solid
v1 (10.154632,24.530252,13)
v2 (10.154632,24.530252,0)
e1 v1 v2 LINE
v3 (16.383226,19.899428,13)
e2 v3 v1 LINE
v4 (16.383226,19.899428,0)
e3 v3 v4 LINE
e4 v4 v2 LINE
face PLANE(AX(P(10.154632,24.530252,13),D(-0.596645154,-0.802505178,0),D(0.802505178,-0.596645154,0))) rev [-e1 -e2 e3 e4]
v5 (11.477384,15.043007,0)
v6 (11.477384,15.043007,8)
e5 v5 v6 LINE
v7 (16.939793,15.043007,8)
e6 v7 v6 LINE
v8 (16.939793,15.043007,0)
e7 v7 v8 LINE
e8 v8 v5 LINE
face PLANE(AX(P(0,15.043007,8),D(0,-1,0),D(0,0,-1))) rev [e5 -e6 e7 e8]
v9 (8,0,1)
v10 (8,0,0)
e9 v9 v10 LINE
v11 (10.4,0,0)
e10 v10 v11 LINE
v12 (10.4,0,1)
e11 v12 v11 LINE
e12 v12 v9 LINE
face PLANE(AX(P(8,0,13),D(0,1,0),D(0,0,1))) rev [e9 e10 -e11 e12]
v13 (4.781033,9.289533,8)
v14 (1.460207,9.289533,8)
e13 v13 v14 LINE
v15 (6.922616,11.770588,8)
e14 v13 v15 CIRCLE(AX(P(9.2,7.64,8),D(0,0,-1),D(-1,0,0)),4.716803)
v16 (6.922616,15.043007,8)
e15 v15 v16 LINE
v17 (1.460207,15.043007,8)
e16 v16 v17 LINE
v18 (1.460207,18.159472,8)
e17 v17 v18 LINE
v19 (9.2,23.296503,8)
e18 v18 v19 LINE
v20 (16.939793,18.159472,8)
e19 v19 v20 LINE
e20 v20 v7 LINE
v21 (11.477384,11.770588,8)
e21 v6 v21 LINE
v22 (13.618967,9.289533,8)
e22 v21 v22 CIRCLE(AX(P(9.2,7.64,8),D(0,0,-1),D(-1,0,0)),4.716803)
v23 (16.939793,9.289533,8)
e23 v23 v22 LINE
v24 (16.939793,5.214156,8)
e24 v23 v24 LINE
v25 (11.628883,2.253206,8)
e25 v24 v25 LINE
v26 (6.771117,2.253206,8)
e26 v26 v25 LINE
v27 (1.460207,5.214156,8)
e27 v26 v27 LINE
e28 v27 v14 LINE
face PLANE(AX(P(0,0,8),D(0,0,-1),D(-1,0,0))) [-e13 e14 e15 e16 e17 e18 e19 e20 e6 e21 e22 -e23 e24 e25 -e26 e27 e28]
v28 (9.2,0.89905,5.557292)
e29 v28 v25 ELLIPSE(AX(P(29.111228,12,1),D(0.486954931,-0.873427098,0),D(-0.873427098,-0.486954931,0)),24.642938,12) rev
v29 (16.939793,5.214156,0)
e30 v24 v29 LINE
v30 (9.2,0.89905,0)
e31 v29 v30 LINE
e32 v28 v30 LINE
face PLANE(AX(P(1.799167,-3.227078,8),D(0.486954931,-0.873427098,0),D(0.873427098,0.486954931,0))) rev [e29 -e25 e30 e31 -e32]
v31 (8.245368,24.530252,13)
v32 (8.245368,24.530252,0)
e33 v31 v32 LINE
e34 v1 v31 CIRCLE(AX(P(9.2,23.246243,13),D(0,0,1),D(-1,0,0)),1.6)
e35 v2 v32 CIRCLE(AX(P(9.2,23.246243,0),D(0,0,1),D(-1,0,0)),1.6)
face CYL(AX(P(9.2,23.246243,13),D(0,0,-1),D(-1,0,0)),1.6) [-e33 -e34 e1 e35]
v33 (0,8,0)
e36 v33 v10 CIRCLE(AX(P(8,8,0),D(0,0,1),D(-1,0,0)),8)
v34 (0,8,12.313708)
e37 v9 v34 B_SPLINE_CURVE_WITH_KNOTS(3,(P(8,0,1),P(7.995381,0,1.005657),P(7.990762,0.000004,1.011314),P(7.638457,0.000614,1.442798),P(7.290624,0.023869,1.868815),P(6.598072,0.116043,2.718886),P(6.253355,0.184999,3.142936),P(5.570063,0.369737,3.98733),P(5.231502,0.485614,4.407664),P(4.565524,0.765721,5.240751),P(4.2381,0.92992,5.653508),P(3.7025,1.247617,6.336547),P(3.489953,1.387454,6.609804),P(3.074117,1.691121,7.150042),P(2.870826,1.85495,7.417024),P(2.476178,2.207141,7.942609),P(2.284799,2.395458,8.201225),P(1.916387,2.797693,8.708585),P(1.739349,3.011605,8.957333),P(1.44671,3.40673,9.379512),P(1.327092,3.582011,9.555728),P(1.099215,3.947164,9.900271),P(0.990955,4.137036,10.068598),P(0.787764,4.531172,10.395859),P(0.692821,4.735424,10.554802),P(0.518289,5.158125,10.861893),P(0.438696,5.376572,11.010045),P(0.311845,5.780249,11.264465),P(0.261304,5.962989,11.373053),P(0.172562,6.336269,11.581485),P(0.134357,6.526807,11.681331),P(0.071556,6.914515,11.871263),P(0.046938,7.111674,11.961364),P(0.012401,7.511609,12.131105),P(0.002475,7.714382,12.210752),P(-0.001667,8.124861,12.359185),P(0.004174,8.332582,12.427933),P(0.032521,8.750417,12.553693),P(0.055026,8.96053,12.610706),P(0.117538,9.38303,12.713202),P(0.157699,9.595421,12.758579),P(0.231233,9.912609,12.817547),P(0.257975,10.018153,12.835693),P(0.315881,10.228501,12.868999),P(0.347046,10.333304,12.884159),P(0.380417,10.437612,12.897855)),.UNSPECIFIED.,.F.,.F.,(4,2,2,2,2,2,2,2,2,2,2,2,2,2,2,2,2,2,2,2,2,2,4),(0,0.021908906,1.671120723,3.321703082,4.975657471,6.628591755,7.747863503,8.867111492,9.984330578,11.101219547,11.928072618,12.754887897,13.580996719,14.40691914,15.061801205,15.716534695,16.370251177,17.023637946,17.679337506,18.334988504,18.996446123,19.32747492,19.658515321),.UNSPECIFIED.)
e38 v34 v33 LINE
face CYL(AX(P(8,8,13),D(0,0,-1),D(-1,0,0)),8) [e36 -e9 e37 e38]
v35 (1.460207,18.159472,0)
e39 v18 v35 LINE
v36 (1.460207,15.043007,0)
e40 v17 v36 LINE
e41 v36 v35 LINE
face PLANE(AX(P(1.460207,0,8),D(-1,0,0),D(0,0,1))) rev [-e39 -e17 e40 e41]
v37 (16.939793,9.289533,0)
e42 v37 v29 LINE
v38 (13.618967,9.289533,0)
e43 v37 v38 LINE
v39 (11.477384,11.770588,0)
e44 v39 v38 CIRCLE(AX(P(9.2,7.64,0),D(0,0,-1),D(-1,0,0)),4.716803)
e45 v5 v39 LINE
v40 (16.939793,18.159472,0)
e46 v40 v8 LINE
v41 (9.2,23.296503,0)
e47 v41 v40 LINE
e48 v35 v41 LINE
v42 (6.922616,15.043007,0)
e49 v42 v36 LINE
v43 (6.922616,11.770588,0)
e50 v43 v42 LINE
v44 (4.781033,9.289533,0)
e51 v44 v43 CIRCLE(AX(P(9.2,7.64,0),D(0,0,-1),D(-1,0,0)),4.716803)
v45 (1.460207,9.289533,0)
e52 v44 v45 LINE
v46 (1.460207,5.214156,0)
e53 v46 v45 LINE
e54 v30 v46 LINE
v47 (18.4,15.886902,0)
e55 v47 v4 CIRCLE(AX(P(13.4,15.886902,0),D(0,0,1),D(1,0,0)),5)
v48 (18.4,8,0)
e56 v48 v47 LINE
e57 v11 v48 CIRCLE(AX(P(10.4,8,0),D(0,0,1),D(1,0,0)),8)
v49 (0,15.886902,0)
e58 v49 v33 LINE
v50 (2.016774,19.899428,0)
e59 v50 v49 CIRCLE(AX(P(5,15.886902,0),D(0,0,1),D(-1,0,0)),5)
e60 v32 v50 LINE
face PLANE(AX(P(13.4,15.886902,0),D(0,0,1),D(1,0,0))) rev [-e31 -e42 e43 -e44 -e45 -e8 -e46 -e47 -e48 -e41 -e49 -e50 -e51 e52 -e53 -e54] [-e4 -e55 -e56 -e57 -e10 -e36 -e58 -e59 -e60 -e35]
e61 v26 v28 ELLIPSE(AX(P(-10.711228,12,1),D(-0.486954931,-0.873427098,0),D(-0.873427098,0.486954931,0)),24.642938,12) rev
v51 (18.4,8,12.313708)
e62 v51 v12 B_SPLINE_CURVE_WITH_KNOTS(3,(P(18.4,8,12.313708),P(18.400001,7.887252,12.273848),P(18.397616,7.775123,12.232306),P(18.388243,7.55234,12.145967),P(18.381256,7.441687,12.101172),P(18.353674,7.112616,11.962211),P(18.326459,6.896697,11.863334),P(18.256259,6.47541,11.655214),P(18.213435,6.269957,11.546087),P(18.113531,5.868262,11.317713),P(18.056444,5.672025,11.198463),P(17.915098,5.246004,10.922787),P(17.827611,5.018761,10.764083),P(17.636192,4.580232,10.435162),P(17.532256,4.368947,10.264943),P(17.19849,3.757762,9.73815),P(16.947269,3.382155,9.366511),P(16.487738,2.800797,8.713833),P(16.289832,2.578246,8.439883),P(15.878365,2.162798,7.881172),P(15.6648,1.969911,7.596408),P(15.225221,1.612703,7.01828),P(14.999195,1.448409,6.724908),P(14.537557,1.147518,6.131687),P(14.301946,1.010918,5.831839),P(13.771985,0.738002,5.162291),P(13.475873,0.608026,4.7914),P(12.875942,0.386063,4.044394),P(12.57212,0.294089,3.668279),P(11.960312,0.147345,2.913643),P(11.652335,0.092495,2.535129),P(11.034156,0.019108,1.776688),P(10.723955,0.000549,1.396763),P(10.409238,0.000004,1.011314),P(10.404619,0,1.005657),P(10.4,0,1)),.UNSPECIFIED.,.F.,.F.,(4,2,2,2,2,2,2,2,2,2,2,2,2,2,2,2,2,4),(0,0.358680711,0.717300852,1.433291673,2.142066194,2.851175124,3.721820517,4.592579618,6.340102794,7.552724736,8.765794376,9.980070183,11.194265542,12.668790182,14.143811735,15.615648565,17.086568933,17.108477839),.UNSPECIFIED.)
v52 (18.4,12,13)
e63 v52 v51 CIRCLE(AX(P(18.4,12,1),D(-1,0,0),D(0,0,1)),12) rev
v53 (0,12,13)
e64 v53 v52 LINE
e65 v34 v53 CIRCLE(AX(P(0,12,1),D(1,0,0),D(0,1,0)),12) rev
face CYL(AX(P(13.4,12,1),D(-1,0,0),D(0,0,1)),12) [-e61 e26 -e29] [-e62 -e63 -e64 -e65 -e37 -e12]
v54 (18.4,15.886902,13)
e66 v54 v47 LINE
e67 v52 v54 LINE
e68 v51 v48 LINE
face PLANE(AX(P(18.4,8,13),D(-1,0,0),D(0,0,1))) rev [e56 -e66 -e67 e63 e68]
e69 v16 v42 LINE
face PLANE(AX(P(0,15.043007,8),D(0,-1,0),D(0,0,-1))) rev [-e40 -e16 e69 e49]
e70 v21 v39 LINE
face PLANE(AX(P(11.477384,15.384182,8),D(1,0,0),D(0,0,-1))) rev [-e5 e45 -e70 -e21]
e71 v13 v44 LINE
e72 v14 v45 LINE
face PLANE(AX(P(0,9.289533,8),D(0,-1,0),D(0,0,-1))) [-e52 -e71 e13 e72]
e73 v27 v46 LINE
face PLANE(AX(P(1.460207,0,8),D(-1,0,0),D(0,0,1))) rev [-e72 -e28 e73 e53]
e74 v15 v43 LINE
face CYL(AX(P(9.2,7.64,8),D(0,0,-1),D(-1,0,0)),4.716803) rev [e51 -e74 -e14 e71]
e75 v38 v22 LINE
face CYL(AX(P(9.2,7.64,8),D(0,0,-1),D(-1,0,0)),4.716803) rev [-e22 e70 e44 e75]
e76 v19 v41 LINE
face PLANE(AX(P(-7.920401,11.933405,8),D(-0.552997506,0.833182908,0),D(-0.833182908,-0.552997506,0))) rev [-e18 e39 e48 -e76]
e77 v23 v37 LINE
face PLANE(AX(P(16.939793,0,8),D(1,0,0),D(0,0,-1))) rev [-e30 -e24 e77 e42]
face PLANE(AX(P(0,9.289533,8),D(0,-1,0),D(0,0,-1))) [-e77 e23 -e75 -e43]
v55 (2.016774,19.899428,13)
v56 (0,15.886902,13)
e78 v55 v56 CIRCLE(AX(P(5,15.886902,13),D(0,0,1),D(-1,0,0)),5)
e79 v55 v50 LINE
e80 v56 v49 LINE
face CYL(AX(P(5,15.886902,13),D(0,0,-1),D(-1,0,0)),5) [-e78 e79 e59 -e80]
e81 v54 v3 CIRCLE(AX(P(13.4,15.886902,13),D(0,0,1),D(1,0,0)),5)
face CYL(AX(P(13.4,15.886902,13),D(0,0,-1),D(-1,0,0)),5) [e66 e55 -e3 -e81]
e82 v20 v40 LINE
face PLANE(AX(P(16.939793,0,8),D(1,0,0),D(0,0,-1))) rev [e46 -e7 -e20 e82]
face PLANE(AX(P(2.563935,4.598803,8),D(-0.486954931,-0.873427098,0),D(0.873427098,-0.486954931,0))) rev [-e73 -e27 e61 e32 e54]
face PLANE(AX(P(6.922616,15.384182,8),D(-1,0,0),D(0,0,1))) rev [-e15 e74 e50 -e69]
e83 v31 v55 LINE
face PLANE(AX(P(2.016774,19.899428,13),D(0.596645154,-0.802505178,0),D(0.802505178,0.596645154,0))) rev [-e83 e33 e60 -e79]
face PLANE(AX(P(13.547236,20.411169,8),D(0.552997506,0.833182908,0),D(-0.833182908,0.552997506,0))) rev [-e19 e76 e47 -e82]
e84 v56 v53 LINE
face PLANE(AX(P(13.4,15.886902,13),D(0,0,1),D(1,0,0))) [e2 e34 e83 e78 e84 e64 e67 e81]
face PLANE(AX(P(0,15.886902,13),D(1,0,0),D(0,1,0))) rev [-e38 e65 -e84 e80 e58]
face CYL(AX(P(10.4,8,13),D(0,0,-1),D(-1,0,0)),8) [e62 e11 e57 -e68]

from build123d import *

# Parameters (mm, degrees)
BOSS_EXTRUDE1_DEPTH = 13
FILLET1_R           = 12
CUT_EXTRUDE1_DEPTH  = 8
SKETCH5_R           = 4.716803238
CUT_EXTRUDE2_DEPTH  = 8
SKETCH6_W           = 4.554767644
SKETCH6_H           = 3.613594083
CUT_EXTRUDE3_DEPTH  = 8


with BuildPart() as part:
    # Sketch2 → Boss-Extrude1 (new body)
    with BuildSketch(Plane.XY):
        with BuildLine():
            Line((8, 0), (10.4, 0))
            ThreePointArc((10.4, 0), (16.056854249, 2.343145751), (18.4, 8))
            Line((18.4, 8), (18.4, 15.886901909))
            ThreePointArc((18.4, 15.886901909), (17.867444955, 18.132327386), (16.383225769, 19.899427797))
            Line((16.383225769, 19.899427797), (10.154632246, 24.530251678))
            ThreePointArc((10.154632246, 24.530251678), (9.2, 24.846243393), (8.245367754, 24.530251678))
            Line((8.245367754, 24.530251678), (2.016774231, 19.899427797))
            ThreePointArc((2.016774231, 19.899427797), (0.532555045, 18.132327386), (0, 15.886901909))
            Line((0, 15.886901909), (0, 8))
            ThreePointArc((0, 8), (2.343145751, 2.343145751), (8, 0))
        make_face()
    extrude(amount=BOSS_EXTRUDE1_DEPTH)

    # Fillet1
    # the kernel refuses this fillet: 12 mm, written as the material it takes off along each edge
    with BuildSketch(Plane(origin=(-22, 0, 13), x_dir=(0, 0, -1), z_dir=(1, 0, 0))) as fillet1_piece_1:
        with BuildLine():
            CenterArc((FILLET1_R, FILLET1_R), FILLET1_R, 180, 90)
            Line((0, FILLET1_R), (0, 0))
            Line((0, 0), (FILLET1_R, 0))
        make_face()
    extrude(amount=62.4, mode=Mode.SUBTRACT)

    # Sketch4 → Cut-Extrude1 (cut)
    with BuildSketch(Plane(origin=(0, 0, 0), x_dir=(-1, 0, 0), z_dir=(0, 0, -1))):
        Polygon((-9.2, 23.296502957), (-16.939792645, 18.15947244), (-16.939792645, 15.04300726), (-1.460207355, 15.04300726), (-1.460207355, 18.15947244), align=None)
        Polygon((-1.460207355, 9.289533082), (-16.939792645, 9.289533082), (-16.939792645, 5.214155538), (-9.2, 0.899049904), (-1.460207355, 5.214155538), align=None)
    extrude(amount=-CUT_EXTRUDE1_DEPTH, mode=Mode.SUBTRACT)

    # Sketch5 → Cut-Extrude2 (cut)
    with BuildSketch(Plane(origin=(0, 0, 0), x_dir=(-1, 0, 0), z_dir=(0, 0, -1))):
        with Locations((-9.2, 7.64)):
            Circle(SKETCH5_R)
    extrude(amount=-CUT_EXTRUDE2_DEPTH, mode=Mode.SUBTRACT)

    # Sketch6 → Cut-Extrude3 (cut)
    with BuildSketch(Plane(origin=(0, 0, 0), x_dir=(-1, 0, 0), z_dir=(0, 0, -1))):
        with Locations((-9.2, 13.577384858)):
            Rectangle(SKETCH6_W, SKETCH6_H)
    extrude(amount=-CUT_EXTRUDE3_DEPTH, mode=Mode.SUBTRACT)


solid = part.part
